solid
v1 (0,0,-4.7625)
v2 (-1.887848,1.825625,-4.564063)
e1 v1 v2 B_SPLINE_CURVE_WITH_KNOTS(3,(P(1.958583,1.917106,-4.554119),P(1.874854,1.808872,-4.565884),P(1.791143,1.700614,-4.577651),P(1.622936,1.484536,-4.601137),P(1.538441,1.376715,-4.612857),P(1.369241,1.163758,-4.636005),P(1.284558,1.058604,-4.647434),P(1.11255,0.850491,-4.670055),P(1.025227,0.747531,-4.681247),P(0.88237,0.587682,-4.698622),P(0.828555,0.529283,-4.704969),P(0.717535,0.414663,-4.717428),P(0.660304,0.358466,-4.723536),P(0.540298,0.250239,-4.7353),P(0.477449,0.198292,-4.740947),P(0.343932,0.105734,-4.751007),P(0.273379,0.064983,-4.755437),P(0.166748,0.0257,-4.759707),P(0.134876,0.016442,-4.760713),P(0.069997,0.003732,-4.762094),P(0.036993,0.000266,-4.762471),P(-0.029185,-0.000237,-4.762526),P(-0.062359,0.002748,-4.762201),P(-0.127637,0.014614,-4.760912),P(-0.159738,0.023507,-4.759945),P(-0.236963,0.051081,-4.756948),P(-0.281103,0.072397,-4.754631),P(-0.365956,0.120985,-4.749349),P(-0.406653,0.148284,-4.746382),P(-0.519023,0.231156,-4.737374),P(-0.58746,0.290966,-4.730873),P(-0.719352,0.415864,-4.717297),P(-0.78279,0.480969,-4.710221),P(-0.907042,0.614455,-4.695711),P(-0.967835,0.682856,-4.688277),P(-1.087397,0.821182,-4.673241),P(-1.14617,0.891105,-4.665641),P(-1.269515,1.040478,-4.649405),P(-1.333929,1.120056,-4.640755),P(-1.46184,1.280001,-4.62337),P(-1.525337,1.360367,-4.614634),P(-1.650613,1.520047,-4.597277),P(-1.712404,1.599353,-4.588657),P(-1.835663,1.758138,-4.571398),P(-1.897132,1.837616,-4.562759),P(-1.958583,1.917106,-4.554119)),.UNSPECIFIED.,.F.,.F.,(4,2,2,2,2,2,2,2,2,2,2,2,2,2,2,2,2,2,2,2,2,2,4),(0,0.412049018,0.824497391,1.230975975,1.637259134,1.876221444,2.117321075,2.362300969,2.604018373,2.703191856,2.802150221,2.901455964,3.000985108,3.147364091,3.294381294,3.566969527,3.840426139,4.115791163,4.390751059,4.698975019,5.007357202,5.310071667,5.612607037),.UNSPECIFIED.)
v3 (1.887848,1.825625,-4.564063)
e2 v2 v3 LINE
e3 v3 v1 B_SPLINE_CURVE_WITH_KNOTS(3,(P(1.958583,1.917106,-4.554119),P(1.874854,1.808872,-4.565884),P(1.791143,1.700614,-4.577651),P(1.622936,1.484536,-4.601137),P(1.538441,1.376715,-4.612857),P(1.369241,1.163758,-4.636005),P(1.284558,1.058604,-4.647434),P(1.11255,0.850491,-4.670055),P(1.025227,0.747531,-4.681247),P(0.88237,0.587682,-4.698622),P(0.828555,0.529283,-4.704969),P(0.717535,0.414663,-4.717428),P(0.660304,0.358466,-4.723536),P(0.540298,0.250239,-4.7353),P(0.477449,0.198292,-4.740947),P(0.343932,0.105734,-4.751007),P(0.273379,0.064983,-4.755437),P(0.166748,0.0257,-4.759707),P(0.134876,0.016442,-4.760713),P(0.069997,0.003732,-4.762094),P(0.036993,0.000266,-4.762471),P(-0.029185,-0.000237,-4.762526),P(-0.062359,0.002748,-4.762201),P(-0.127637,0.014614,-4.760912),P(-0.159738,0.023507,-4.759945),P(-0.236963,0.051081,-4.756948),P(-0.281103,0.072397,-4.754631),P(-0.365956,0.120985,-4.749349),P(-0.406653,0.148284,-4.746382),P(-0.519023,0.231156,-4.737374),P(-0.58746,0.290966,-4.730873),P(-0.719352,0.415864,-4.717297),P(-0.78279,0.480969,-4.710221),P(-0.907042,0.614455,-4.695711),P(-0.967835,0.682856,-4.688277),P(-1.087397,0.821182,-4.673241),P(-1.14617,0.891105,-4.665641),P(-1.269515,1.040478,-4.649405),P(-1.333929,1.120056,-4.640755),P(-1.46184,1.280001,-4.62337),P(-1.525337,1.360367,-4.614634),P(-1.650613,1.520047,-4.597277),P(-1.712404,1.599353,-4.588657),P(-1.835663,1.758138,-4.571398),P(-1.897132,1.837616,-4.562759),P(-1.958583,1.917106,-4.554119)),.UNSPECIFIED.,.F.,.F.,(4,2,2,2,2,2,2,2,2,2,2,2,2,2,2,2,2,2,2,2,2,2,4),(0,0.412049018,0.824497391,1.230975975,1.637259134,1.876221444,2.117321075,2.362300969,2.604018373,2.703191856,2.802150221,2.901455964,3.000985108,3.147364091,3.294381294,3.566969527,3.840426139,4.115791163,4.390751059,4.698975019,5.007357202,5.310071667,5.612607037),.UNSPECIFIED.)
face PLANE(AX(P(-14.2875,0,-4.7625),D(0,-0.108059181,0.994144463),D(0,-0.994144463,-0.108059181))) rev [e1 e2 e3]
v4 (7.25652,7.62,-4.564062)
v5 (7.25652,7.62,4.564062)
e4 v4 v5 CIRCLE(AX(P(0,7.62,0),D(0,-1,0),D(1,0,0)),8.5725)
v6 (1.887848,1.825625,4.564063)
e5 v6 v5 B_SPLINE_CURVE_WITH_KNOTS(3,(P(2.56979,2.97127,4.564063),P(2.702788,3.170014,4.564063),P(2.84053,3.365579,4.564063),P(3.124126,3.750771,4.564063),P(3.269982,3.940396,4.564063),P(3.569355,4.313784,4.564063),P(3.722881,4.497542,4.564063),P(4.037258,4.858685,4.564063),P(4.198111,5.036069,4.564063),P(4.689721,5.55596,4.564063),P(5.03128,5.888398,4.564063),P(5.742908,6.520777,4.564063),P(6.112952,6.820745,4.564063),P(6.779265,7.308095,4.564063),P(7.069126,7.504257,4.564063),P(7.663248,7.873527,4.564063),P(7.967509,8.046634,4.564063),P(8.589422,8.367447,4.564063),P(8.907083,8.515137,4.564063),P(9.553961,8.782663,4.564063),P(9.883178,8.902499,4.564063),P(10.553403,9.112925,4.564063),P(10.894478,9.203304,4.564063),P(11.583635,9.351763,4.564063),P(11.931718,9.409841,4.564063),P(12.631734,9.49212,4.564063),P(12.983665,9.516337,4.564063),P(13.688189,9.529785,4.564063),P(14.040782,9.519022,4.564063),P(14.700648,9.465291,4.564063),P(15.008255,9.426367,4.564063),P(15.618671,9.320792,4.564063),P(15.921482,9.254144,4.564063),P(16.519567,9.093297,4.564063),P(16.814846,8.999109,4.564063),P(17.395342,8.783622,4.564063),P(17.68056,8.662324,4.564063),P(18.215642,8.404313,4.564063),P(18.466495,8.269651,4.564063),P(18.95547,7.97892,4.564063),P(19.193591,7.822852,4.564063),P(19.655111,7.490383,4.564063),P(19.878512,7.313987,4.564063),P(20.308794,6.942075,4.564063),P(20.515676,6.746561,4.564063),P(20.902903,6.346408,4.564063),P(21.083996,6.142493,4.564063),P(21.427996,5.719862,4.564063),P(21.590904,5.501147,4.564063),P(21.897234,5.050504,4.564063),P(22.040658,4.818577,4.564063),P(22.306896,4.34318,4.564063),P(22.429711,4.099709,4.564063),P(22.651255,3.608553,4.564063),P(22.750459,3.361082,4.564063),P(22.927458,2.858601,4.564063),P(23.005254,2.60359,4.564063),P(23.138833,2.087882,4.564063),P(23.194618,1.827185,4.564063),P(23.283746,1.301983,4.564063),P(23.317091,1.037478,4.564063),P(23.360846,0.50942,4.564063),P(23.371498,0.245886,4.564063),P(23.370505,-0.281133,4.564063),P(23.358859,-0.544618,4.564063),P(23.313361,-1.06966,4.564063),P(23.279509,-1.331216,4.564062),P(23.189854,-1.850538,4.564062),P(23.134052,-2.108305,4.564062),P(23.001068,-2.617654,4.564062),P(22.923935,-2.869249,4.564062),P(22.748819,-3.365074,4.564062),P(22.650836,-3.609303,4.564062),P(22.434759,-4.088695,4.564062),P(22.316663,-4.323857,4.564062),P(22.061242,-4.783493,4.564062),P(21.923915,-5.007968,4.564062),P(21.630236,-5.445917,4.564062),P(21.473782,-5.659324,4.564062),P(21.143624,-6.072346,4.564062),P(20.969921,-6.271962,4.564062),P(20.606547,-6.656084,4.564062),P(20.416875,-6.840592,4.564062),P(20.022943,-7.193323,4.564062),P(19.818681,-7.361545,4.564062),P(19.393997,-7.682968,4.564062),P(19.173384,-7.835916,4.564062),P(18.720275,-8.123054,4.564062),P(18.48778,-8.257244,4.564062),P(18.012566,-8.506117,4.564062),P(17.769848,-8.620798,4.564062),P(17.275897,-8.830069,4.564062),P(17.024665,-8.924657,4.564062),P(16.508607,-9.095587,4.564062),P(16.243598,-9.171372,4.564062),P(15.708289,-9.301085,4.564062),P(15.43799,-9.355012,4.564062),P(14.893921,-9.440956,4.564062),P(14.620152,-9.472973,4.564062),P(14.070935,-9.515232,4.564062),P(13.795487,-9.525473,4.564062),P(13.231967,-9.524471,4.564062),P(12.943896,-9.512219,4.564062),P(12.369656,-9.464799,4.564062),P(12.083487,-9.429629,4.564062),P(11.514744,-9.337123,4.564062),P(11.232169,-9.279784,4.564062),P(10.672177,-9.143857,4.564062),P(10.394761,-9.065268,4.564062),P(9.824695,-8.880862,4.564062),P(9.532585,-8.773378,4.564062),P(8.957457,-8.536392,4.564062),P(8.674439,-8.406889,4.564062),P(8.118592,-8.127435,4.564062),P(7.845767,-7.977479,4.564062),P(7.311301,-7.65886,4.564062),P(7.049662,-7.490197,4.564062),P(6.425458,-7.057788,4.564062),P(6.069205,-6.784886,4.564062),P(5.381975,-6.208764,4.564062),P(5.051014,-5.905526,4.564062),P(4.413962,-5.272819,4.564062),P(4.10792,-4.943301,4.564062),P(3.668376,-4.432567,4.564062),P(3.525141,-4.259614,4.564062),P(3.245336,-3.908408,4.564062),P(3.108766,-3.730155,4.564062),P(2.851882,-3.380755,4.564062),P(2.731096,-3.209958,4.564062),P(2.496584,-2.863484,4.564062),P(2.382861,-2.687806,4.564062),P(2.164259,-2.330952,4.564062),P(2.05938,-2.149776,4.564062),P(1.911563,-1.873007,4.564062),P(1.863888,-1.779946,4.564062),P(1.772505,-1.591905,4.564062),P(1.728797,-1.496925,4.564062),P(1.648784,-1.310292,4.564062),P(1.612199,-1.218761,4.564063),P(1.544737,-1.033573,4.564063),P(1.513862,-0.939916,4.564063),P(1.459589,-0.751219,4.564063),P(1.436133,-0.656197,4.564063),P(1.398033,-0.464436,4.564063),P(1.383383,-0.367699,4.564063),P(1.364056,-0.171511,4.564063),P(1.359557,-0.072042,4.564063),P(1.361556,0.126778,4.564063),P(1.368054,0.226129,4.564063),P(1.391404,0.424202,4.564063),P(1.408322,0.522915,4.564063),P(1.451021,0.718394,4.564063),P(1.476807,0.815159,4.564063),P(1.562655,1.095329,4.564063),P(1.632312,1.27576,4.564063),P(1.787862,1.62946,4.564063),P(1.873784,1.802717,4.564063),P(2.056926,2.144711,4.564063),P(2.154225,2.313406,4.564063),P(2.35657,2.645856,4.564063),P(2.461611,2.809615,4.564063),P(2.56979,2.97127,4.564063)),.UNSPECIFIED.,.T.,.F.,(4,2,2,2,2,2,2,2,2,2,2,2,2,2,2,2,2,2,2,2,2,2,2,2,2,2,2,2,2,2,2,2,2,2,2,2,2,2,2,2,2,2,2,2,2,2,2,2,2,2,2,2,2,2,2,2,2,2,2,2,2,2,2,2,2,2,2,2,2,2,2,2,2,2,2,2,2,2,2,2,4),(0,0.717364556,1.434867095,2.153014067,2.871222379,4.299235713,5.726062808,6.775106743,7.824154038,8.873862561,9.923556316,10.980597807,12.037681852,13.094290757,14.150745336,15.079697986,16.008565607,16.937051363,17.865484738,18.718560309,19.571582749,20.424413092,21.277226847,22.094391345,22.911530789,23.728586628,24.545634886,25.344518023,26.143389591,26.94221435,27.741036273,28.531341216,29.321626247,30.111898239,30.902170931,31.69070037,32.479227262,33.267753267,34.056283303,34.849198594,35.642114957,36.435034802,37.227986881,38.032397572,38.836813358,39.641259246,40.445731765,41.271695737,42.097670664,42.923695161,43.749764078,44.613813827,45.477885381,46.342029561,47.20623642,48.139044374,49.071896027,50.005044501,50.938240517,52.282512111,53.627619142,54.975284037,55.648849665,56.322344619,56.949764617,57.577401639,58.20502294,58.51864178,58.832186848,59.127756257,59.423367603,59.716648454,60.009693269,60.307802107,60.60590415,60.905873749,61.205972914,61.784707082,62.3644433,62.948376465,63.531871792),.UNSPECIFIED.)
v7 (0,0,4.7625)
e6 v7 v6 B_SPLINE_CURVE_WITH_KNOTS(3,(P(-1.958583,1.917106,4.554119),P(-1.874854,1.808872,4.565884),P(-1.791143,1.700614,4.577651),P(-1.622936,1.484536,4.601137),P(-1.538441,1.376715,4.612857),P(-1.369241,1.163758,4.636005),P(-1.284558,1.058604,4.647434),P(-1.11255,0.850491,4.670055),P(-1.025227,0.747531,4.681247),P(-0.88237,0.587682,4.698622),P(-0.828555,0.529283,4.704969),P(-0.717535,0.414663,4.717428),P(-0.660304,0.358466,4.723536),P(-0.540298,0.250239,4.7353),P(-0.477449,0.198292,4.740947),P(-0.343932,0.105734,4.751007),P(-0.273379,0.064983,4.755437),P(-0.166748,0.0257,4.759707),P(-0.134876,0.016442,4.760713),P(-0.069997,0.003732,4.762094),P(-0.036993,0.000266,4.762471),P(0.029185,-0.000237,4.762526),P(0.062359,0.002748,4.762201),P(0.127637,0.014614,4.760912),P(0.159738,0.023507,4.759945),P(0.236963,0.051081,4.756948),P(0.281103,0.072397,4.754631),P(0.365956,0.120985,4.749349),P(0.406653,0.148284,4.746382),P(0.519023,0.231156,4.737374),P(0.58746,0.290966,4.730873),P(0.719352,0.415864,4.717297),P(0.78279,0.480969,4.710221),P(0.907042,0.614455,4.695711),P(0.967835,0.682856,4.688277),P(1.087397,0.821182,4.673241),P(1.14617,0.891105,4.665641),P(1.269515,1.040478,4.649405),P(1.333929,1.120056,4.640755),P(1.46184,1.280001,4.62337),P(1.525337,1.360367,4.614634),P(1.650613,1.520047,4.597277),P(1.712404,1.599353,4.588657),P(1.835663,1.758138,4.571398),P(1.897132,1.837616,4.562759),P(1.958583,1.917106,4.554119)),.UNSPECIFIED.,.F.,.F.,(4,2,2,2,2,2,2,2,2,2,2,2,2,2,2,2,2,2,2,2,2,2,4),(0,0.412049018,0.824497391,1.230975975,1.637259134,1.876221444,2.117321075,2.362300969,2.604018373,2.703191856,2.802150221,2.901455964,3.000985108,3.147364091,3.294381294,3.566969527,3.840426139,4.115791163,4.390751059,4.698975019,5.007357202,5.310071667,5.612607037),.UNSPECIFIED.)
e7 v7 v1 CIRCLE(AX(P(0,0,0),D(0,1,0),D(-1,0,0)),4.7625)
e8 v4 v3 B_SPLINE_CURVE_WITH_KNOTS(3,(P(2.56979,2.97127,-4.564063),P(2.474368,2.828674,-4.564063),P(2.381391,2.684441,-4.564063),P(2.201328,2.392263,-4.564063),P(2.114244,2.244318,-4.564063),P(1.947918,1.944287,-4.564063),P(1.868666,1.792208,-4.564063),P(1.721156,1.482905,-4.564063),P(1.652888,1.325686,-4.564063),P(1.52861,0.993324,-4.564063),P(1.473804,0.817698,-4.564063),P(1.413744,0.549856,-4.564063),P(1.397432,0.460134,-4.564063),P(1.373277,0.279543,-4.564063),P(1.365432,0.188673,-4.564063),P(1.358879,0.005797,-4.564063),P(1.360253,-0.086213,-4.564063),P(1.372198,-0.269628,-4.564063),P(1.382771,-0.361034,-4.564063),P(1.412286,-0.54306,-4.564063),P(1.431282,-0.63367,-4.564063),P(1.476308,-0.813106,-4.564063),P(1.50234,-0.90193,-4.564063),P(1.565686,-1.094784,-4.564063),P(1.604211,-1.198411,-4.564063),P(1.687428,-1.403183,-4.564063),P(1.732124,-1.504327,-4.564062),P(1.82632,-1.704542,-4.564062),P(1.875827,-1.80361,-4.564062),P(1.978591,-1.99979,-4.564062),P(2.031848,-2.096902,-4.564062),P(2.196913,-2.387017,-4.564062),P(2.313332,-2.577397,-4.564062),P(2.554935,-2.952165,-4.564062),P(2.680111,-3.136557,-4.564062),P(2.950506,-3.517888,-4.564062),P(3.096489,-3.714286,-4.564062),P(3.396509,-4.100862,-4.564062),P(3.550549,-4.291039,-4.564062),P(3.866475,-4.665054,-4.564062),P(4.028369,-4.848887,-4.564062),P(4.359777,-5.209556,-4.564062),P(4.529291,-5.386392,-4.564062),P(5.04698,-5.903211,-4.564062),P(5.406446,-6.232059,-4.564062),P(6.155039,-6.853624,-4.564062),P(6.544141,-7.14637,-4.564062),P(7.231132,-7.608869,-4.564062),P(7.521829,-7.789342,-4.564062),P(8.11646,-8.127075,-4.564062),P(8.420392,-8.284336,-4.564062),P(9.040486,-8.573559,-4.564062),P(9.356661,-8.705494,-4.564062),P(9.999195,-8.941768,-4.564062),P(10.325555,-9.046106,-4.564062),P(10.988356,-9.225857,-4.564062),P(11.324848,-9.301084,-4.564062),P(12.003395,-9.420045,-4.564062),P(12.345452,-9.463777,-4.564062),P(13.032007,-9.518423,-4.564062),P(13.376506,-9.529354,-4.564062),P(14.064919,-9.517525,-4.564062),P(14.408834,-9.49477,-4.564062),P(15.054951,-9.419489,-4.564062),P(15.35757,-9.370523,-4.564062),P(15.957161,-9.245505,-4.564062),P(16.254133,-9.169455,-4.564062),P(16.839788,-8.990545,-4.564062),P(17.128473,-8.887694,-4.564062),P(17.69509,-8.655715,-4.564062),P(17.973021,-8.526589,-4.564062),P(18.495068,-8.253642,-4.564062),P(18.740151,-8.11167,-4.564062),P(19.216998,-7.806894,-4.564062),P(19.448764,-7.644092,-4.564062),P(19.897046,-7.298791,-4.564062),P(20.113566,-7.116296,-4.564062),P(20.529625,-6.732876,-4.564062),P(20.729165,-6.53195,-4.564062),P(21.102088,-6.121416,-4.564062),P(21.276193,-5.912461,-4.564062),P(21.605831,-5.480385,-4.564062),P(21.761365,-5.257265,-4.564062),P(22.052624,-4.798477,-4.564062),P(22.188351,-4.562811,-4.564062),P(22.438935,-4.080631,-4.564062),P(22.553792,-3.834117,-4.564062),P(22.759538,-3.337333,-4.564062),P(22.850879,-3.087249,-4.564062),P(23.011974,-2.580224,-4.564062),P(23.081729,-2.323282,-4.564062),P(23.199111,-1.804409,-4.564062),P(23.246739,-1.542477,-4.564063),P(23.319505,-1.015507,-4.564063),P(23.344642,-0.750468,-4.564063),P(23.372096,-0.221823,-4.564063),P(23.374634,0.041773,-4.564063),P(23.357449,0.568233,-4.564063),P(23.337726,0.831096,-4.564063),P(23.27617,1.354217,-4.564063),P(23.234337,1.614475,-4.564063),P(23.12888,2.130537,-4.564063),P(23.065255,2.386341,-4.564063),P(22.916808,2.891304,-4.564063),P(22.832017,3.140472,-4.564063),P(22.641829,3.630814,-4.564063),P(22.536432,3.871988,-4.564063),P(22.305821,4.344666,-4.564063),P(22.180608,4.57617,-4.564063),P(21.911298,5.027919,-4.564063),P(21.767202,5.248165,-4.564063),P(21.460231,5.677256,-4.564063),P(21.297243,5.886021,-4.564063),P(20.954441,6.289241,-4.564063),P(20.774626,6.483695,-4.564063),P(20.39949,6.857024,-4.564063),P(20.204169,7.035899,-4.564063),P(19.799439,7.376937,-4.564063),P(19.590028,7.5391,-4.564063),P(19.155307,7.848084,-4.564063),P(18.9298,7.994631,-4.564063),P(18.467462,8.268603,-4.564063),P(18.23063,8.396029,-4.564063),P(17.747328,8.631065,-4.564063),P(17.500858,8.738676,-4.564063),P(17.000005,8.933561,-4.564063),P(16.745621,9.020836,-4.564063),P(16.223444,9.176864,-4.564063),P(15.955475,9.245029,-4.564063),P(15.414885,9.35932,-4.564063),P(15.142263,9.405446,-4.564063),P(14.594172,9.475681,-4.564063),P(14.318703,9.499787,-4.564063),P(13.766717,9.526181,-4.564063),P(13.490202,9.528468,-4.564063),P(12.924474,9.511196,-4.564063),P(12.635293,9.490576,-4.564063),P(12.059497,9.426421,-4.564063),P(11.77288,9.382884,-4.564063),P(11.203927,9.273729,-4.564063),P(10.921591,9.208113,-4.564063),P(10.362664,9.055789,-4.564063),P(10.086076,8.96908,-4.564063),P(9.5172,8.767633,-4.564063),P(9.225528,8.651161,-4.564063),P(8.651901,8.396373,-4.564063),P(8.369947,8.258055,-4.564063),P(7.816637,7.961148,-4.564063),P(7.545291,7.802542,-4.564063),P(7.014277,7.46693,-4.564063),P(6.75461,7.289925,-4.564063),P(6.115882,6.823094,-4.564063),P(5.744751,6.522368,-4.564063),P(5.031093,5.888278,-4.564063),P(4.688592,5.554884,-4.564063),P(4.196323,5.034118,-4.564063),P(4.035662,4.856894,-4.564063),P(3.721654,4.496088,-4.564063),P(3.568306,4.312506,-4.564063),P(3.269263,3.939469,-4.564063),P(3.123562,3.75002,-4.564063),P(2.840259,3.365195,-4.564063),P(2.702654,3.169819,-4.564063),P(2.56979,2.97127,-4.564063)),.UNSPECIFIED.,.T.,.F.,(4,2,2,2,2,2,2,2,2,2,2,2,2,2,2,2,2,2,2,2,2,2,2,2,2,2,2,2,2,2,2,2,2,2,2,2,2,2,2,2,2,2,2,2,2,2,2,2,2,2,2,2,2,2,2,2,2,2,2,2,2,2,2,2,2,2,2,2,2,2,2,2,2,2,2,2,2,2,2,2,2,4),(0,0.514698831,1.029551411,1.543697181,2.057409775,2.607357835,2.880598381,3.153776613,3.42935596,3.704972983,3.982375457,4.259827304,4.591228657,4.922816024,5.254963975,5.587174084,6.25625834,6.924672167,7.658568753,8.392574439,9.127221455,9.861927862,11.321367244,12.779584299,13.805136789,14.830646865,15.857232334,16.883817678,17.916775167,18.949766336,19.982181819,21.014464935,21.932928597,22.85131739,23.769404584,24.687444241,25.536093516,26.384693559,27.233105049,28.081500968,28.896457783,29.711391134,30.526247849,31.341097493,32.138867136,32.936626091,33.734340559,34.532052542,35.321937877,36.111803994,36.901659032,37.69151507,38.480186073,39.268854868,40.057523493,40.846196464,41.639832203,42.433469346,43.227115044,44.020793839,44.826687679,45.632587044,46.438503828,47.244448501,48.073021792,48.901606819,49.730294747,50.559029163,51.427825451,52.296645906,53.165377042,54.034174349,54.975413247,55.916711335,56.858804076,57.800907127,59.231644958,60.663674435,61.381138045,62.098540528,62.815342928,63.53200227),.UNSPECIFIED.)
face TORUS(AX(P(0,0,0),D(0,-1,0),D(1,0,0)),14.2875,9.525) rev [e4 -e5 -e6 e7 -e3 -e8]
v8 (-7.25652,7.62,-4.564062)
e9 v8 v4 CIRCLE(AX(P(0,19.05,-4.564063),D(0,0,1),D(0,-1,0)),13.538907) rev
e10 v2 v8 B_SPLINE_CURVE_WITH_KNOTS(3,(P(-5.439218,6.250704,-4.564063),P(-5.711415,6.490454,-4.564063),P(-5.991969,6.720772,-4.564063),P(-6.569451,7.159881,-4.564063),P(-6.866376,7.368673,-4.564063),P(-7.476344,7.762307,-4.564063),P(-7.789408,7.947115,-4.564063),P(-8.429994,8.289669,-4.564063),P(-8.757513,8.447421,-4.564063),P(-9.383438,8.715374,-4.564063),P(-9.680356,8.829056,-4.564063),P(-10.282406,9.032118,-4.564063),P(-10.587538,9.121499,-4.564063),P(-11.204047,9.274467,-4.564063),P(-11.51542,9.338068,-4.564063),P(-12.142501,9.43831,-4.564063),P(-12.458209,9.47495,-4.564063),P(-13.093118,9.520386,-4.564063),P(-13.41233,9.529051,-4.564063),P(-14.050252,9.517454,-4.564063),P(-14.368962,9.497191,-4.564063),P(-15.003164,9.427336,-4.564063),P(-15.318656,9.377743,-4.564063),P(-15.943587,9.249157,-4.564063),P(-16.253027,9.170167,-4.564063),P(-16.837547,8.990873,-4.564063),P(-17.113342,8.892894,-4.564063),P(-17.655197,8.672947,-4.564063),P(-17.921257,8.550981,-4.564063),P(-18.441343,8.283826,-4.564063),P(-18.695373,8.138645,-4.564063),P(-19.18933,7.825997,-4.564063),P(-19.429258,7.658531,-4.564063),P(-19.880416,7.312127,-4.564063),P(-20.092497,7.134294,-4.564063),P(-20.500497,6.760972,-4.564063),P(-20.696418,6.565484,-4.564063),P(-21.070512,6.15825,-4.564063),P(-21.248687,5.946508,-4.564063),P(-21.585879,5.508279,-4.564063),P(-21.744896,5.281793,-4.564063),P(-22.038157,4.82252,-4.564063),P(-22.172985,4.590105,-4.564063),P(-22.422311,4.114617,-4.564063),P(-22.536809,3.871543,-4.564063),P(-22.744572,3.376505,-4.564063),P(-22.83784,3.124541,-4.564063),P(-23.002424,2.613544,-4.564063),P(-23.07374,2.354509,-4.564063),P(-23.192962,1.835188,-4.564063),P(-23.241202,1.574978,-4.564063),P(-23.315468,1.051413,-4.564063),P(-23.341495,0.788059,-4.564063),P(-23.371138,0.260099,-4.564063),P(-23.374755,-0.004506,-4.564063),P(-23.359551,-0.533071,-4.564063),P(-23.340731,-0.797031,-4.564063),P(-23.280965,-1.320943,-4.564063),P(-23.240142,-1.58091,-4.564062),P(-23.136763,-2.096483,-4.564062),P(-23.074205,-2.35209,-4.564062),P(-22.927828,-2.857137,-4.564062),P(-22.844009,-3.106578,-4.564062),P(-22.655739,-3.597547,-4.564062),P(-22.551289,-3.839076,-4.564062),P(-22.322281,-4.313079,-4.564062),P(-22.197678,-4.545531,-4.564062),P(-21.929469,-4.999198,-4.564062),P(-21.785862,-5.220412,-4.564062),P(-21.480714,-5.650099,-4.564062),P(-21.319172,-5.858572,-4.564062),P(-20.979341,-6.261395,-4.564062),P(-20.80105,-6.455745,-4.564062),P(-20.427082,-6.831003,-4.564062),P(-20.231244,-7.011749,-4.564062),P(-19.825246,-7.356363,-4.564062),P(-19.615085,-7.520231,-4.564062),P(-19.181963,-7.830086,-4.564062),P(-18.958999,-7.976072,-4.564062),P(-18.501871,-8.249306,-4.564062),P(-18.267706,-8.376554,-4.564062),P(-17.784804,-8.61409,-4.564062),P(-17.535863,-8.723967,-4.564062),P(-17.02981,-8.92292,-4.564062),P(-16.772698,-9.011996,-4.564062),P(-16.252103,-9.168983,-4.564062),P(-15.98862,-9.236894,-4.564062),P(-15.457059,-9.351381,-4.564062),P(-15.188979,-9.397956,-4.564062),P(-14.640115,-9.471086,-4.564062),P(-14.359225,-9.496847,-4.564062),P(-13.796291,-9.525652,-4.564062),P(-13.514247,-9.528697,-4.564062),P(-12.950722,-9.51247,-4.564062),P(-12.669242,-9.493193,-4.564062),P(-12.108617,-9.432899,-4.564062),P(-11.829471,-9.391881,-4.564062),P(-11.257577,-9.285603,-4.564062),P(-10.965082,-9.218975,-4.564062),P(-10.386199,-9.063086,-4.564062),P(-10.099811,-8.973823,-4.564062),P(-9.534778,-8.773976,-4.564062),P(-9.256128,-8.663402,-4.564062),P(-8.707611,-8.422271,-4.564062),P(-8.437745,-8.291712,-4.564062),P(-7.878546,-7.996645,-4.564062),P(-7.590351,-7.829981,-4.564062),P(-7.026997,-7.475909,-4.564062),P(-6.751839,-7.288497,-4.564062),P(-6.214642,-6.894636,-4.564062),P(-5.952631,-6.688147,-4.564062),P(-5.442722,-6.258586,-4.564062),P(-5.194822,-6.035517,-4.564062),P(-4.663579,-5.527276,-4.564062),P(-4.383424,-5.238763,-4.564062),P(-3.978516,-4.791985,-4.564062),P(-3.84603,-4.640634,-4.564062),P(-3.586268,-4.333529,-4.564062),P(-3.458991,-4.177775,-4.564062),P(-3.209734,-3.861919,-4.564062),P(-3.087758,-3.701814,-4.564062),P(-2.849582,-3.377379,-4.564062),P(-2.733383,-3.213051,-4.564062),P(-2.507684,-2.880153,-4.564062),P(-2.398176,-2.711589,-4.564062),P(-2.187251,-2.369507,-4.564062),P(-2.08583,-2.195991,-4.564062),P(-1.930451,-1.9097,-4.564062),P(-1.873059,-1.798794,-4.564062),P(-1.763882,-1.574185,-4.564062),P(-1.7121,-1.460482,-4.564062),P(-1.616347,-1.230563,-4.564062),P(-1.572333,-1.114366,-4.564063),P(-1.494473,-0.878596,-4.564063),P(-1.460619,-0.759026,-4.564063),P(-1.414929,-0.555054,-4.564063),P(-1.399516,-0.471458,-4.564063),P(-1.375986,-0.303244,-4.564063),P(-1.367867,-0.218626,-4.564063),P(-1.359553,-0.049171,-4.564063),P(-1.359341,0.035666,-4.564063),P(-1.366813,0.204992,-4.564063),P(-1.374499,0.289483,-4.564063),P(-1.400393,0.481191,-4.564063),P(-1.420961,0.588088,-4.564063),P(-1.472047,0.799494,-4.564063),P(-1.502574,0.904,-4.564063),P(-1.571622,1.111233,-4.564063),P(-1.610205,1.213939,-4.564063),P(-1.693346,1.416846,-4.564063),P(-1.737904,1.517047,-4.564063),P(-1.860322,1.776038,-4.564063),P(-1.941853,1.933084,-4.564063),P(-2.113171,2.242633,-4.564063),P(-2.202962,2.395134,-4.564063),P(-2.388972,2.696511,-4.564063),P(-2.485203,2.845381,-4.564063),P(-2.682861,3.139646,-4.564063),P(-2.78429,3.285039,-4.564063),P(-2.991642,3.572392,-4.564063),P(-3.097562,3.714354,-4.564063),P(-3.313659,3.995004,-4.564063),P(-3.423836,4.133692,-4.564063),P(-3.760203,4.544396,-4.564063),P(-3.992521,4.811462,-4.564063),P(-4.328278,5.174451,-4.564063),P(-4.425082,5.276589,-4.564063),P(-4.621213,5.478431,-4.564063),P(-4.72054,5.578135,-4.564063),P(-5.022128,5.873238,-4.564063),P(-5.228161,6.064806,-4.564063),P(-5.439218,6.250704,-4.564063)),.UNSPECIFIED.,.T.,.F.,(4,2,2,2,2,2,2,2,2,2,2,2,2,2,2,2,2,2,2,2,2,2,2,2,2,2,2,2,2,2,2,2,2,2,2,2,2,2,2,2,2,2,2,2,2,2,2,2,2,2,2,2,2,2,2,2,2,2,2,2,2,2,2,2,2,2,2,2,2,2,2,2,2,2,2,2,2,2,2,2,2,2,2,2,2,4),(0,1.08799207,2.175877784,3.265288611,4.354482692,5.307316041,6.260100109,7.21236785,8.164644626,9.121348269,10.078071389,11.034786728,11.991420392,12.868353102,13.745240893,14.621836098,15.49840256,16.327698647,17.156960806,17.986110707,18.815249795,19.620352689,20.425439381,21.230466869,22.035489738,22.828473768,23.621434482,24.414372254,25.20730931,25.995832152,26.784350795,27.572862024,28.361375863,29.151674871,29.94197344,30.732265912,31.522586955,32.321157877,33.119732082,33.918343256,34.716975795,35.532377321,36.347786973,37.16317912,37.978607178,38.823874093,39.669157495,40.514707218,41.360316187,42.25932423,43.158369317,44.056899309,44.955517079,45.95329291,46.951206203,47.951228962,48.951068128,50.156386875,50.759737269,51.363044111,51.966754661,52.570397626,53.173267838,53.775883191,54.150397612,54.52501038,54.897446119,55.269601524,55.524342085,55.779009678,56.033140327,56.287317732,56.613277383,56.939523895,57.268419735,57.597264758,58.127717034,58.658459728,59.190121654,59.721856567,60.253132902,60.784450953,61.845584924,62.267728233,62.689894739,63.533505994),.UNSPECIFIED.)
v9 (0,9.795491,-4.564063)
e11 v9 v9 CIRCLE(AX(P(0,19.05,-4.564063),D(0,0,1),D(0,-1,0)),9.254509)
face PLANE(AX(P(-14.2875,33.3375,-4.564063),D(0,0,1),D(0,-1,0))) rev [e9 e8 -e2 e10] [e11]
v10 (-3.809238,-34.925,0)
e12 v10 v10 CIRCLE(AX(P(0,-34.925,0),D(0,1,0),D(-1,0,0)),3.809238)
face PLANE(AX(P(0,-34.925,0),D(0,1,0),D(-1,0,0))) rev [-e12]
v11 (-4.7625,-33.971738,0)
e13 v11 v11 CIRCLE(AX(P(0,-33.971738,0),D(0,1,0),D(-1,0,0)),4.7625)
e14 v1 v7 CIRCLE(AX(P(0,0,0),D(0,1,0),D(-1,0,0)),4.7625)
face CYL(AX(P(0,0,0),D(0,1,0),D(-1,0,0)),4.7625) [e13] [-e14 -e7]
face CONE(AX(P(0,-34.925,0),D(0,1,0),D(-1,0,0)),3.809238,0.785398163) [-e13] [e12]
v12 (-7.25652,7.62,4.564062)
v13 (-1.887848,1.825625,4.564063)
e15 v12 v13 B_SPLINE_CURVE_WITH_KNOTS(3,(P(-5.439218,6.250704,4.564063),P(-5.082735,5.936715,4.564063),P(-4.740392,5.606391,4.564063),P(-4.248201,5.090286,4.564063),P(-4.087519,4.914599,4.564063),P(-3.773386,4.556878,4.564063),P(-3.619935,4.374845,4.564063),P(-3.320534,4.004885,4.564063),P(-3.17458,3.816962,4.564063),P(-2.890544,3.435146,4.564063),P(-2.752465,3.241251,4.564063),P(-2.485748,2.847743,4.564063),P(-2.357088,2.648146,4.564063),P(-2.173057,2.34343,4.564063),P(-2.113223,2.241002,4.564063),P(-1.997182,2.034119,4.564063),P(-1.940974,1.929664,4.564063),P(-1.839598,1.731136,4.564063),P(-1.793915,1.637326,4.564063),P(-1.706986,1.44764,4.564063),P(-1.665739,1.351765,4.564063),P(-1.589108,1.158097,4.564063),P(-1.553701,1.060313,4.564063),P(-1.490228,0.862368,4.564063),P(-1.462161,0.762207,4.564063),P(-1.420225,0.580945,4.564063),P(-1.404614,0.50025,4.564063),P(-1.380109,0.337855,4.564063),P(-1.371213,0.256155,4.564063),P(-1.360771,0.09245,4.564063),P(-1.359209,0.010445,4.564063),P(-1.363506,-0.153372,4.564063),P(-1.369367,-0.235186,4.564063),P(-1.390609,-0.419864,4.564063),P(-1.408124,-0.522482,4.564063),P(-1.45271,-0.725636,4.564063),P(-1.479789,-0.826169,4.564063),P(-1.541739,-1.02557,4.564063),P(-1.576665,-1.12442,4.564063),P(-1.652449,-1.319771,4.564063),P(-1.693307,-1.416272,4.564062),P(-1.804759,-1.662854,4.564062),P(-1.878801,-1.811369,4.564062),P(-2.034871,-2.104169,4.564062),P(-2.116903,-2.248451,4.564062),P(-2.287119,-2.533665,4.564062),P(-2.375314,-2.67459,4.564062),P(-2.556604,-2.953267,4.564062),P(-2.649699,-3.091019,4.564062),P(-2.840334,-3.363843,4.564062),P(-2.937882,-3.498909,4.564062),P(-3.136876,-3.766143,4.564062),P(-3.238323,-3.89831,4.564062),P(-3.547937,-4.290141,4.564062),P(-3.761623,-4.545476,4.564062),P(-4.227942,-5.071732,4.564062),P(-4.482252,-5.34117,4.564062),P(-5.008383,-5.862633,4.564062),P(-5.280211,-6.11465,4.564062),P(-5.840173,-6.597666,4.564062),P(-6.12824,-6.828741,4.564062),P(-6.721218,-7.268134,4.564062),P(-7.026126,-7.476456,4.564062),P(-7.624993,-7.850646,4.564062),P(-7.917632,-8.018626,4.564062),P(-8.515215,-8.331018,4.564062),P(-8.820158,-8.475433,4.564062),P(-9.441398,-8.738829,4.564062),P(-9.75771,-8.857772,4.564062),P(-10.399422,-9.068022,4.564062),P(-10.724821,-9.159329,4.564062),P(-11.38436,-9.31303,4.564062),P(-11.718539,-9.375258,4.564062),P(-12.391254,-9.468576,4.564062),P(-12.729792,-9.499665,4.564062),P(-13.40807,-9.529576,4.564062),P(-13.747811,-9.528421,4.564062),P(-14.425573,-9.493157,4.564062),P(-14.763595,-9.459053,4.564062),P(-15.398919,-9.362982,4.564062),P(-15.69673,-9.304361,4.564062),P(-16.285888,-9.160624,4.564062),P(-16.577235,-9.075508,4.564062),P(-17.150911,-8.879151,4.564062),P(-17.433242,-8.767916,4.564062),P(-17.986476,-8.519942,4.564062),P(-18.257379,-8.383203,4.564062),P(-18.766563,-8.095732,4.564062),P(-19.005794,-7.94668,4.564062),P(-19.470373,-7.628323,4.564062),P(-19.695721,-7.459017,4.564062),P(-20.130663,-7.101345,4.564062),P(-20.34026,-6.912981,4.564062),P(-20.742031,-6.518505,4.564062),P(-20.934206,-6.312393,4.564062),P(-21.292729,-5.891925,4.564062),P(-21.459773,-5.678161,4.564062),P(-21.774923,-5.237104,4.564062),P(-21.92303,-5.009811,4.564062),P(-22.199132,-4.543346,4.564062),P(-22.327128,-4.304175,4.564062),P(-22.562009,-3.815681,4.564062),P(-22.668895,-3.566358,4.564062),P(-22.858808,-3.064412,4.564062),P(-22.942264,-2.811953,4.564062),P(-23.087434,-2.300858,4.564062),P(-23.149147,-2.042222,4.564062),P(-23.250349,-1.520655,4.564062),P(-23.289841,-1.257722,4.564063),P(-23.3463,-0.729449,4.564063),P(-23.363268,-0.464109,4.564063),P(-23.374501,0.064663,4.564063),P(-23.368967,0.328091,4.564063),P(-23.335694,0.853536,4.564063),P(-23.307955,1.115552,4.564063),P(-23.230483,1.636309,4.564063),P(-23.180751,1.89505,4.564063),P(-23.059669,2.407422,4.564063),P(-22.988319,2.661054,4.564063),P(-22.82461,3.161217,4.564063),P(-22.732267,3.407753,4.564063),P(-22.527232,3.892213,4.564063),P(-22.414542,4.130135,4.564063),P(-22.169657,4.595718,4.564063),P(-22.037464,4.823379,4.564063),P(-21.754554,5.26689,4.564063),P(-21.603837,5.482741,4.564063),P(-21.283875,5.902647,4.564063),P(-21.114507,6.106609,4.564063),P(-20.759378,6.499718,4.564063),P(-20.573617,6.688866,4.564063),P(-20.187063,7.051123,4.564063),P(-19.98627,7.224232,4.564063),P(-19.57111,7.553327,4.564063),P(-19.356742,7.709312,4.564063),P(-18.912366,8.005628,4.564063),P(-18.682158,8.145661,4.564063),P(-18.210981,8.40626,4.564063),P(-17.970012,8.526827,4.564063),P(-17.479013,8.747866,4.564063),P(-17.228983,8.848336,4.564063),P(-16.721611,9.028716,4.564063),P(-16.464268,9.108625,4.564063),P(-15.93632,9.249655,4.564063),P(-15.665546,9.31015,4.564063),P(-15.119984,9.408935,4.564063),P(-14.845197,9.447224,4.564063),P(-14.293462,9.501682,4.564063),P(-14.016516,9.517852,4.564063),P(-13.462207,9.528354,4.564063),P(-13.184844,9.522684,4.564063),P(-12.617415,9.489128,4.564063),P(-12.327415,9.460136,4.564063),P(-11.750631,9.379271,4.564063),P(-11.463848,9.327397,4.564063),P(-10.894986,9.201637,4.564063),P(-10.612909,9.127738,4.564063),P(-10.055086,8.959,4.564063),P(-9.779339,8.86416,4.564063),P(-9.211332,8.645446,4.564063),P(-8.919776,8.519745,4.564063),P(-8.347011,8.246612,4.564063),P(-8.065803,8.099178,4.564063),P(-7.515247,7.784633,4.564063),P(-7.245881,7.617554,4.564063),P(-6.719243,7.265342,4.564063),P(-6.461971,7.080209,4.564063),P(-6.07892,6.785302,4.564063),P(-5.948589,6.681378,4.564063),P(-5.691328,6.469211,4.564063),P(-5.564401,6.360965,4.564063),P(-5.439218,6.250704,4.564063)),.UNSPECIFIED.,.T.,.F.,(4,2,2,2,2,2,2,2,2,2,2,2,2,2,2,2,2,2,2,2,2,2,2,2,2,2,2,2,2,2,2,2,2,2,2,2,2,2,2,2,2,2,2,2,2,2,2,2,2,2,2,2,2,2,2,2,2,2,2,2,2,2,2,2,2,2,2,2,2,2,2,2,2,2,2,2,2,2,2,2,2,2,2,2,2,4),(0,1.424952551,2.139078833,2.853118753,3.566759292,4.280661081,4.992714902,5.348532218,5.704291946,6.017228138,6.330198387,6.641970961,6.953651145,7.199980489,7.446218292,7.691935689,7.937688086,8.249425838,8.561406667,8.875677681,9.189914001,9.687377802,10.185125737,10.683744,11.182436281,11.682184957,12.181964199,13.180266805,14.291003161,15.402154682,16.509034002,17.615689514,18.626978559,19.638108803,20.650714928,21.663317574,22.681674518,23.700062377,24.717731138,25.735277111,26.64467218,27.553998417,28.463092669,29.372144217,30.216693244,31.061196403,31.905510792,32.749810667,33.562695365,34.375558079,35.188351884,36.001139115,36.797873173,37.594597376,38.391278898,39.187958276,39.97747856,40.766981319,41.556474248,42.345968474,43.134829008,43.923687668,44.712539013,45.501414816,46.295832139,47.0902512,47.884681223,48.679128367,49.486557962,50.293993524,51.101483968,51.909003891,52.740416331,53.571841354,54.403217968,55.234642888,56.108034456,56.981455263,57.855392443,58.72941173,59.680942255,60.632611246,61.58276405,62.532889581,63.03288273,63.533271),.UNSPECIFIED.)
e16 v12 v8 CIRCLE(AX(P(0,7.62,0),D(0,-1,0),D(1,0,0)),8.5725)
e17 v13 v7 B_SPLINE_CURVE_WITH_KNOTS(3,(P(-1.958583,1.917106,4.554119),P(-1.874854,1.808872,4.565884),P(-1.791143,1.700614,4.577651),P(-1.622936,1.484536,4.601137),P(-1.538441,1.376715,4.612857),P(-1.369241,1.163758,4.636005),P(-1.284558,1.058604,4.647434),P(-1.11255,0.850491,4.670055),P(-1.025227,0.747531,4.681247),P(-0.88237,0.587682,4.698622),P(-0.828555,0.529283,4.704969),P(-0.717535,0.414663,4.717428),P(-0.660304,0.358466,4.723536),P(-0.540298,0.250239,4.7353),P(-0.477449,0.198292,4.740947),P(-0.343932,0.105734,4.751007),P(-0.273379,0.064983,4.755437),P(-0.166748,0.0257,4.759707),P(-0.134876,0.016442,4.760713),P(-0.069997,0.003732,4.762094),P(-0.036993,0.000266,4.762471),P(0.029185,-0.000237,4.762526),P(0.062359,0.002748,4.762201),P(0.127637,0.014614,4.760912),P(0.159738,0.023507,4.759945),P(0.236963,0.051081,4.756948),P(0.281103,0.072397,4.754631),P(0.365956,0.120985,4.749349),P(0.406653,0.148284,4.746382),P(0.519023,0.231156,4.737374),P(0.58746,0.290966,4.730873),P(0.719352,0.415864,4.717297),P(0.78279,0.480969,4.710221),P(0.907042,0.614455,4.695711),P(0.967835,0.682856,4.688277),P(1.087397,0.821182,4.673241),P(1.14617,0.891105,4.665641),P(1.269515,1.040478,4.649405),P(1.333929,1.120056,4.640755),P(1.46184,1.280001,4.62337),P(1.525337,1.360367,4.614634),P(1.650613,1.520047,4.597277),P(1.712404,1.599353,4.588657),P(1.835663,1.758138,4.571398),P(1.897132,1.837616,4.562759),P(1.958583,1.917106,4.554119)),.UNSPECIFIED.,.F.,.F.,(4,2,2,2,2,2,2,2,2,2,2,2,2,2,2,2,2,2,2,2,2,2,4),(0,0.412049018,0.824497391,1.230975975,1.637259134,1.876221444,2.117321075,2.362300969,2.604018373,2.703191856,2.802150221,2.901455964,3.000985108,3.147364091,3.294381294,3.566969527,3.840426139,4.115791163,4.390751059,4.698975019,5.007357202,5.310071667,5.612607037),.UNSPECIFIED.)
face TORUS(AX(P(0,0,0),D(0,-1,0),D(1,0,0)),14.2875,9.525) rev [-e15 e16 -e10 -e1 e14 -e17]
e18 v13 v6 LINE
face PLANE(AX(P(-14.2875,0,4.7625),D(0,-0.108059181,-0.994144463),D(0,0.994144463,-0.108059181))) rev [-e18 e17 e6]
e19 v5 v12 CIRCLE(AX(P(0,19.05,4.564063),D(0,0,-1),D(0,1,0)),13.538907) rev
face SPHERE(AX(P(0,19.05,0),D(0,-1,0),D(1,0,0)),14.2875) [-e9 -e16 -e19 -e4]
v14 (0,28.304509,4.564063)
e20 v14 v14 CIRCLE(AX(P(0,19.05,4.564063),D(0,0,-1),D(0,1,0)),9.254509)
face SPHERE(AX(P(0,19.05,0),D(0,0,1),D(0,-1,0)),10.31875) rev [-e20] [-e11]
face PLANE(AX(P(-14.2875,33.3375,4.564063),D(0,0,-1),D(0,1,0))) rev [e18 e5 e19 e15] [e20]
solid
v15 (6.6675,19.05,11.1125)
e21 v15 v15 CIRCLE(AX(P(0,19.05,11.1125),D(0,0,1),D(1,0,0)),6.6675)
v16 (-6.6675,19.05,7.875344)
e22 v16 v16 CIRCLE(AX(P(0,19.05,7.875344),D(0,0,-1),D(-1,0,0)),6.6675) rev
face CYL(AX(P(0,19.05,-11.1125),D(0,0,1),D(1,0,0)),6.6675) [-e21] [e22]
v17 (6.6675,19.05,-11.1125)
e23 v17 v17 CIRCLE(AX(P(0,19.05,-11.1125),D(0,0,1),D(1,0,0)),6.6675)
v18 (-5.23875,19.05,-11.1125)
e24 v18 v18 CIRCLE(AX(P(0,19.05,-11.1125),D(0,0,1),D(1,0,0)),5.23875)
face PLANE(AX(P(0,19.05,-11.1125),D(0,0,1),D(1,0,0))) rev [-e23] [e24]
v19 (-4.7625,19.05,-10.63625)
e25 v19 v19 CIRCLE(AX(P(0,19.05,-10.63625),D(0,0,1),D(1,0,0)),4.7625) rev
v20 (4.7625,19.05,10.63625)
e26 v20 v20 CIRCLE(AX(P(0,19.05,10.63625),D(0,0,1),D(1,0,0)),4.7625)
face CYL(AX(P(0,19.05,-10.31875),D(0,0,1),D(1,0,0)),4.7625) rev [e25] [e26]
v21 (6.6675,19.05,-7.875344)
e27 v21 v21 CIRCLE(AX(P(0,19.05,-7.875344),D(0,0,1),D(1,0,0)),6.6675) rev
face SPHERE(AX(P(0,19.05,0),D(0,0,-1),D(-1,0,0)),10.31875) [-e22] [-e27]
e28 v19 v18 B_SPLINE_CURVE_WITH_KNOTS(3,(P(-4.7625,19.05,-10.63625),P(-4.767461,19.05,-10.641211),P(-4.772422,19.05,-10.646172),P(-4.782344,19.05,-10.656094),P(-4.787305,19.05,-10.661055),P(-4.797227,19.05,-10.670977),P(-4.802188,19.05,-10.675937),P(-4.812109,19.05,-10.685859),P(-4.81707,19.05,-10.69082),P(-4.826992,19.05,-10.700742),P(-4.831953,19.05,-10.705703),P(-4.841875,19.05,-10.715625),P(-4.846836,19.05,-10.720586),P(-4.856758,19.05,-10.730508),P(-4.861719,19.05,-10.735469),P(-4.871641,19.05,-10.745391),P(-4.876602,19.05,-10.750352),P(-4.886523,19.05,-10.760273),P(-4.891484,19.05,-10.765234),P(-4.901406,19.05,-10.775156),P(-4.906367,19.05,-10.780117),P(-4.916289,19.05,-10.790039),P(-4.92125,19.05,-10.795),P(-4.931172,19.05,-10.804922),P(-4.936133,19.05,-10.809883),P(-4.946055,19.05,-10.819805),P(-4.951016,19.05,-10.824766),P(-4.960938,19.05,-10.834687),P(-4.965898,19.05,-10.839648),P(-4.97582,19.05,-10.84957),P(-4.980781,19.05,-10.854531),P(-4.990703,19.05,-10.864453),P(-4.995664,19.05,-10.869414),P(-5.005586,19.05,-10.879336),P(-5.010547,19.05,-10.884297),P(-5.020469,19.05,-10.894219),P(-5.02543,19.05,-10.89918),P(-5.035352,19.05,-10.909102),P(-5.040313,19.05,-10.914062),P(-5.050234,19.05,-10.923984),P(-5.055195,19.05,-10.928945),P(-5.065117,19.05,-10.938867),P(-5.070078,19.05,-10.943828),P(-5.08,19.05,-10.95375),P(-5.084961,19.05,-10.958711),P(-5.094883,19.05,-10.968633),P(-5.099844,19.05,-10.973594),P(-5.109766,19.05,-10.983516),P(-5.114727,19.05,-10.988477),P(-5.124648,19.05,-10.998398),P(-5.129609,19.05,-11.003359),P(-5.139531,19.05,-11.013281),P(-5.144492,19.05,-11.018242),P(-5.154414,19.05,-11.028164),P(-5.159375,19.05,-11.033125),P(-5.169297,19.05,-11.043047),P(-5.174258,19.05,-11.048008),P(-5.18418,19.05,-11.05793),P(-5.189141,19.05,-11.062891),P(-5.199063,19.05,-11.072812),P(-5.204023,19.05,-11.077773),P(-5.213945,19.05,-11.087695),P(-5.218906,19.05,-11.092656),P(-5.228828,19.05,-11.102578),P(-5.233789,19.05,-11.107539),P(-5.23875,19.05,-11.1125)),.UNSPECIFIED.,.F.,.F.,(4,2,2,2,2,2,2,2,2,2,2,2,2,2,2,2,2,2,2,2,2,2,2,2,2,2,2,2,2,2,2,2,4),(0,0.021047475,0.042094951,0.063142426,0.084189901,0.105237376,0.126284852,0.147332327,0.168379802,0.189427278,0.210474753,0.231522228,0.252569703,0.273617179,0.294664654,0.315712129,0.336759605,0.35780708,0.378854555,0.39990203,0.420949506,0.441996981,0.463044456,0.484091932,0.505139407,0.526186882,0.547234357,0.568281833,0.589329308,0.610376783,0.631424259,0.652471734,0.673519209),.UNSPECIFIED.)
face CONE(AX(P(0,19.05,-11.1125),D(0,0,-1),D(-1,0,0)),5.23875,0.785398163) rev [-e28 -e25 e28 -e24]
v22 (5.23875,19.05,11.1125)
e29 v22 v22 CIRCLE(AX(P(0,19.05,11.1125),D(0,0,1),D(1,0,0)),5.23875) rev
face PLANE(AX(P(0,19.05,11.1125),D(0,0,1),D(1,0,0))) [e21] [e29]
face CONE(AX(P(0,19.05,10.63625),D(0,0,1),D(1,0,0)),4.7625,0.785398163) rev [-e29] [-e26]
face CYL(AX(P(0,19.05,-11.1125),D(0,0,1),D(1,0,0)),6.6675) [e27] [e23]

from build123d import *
from OCP.BRepAlgoAPI import BRepAlgoAPI_Cut
from OCP.TopTools import TopTools_ListOfShape

# Parameters (mm, degrees)
CUT_EXTRUDE1_DEPTH      = 41.348741461
CUT_EXTRUDE1_DEPTH_BACK = 41.348741461
CUT_EXTRUDE4_DEPTH      = 40.119878359
CUT_EXTRUDE4_DEPTH_BACK = 40.119878359
SKETCH10_R              = 4.7625
EXTRUDE1_DEPTH          = 11.1125
EXTRUDE1_DEPTH_BACK     = 11.1125
SKETCH12_R              = 6.6675
SKETCH12_R_2            = 4.7625
CHAMFER1_SIZE           = 0.47625


with BuildPart() as part:
    # Sketch13 → Revolve4 (revolve)
    with BuildSketch(Plane.XY, mode=Mode.PRIVATE) as revolve4_sk:
        Polygon((3.809238, -34.925), (4.7625, -33.971738), (4.7625, 0), (0, 0), (0, -34.925), align=None)
    revolve(revolve4_sk.sketch.rotate(Axis((0, 0, 0), (0, -1, 0)), 180), axis=Axis((0, 0, 0), (0, -1, 0)))

    # Sketch4 → Revolve2 (revolve)
    with BuildSketch(Plane.XY):
        with BuildLine():
            Line((0, 8.73125), (0, 0))
            Line((0, 0), (4.7625, 0))
            ThreePointArc((4.7625, 0), (5.768081006, 4.259709497), (8.5725, 7.62))
            ThreePointArc((8.5725, 7.62), (13.554312621, 23.568104207), (0, 33.3375))
            Line((0, 33.3375), (0, 29.36875))
            ThreePointArc((0, 29.36875), (10.31875, 19.05), (0, 8.73125))
        make_face()
    revolve(axis=Axis((0, 33.3375, 0), (0, 1, 0)))


with BuildPart() as cut_extrude1_tool:
    # Sketch5 → Cut-Extrude1 (new, two sides: drawn at the far end of the back side and taken through both)
    with BuildSketch(Plane(origin=(0, 0, 0), x_dir=(0, 0, -1), z_dir=(1, 0, 0)).offset(-CUT_EXTRUDE1_DEPTH_BACK)):
        Polygon((4.5640625, 33.3375), (14.2875, 33.3375), (14.2875, 0), (4.7625, 0), (4.5640625, 1.825625), align=None)
        Polygon((-4.5640625, 33.3375), (-4.5640625, 1.825625), (-4.7625, 0), (-14.2875, 0), (-14.2875, 33.3375), align=None)
    extrude(amount=CUT_EXTRUDE1_DEPTH + CUT_EXTRUDE1_DEPTH_BACK)


with BuildPart() as part_1:
    add(part.part)

    # Cut-Extrude1: cut by cut_extrude1_tool, with a tolerance
    cut_extrude1_stock = TopTools_ListOfShape()
    cut_extrude1_stock.Append(part_1.part.wrapped)
    cut_extrude1_tools = TopTools_ListOfShape()
    cut_extrude1_tools.Append(cut_extrude1_tool.part.wrapped)
    cut_extrude1_cut = BRepAlgoAPI_Cut()
    cut_extrude1_cut.SetArguments(cut_extrude1_stock)
    cut_extrude1_cut.SetTools(cut_extrude1_tools)
    cut_extrude1_cut.SetFuzzyValue(0.00001)
    cut_extrude1_cut.Build()
    add(Compound.cast(cut_extrude1_cut.Shape()).solids(), mode=Mode.REPLACE)


with BuildPart() as body_2:
    # Sketch7 → Revolve3 (revolve)
    with BuildSketch(Plane.XY):
        with BuildLine():
            Line((0, 29.36875), (0, 8.73125))
            ThreePointArc((0, 8.73125), (10.31875, 19.05), (0, 29.36875))
        make_face()
    revolve(axis=Axis((0, 0, 0), (0, 1, 0)))

    # Sketch10 → Cut-Extrude4 (cut, two sides: drawn at the far end of the back side and taken through both)
    with BuildSketch(Plane.XY.offset(-CUT_EXTRUDE4_DEPTH_BACK)):
        with Locations(Location((0, 19.05, 0), (0, 0, 180))):
            Circle(SKETCH10_R)
    extrude(amount=CUT_EXTRUDE4_DEPTH + CUT_EXTRUDE4_DEPTH_BACK, mode=Mode.SUBTRACT)

    # Sketch12 → Extrude1 (add, two sides: drawn at the far end of the back side and taken through both)
    with BuildSketch(Plane.XY.offset(-EXTRUDE1_DEPTH_BACK)):
        with Locations((0, 19.05)):
            Circle(SKETCH12_R)
        with Locations((0, 19.05)):
            Circle(SKETCH12_R_2, mode=Mode.SUBTRACT)
    extrude(amount=EXTRUDE1_DEPTH + EXTRUDE1_DEPTH_BACK)

    # Chamfer1
    chamfer1_edges = [body_2.edges().sort_by_distance(p)[0] for p in [
        (-4.7625, 19.05, 11.1125),
        (-4.7625, 19.05, -11.1125),
    ]]
    chamfer(chamfer1_edges, length=CHAMFER1_SIZE)


solid = Compound([part_1.part, body_2.part])
